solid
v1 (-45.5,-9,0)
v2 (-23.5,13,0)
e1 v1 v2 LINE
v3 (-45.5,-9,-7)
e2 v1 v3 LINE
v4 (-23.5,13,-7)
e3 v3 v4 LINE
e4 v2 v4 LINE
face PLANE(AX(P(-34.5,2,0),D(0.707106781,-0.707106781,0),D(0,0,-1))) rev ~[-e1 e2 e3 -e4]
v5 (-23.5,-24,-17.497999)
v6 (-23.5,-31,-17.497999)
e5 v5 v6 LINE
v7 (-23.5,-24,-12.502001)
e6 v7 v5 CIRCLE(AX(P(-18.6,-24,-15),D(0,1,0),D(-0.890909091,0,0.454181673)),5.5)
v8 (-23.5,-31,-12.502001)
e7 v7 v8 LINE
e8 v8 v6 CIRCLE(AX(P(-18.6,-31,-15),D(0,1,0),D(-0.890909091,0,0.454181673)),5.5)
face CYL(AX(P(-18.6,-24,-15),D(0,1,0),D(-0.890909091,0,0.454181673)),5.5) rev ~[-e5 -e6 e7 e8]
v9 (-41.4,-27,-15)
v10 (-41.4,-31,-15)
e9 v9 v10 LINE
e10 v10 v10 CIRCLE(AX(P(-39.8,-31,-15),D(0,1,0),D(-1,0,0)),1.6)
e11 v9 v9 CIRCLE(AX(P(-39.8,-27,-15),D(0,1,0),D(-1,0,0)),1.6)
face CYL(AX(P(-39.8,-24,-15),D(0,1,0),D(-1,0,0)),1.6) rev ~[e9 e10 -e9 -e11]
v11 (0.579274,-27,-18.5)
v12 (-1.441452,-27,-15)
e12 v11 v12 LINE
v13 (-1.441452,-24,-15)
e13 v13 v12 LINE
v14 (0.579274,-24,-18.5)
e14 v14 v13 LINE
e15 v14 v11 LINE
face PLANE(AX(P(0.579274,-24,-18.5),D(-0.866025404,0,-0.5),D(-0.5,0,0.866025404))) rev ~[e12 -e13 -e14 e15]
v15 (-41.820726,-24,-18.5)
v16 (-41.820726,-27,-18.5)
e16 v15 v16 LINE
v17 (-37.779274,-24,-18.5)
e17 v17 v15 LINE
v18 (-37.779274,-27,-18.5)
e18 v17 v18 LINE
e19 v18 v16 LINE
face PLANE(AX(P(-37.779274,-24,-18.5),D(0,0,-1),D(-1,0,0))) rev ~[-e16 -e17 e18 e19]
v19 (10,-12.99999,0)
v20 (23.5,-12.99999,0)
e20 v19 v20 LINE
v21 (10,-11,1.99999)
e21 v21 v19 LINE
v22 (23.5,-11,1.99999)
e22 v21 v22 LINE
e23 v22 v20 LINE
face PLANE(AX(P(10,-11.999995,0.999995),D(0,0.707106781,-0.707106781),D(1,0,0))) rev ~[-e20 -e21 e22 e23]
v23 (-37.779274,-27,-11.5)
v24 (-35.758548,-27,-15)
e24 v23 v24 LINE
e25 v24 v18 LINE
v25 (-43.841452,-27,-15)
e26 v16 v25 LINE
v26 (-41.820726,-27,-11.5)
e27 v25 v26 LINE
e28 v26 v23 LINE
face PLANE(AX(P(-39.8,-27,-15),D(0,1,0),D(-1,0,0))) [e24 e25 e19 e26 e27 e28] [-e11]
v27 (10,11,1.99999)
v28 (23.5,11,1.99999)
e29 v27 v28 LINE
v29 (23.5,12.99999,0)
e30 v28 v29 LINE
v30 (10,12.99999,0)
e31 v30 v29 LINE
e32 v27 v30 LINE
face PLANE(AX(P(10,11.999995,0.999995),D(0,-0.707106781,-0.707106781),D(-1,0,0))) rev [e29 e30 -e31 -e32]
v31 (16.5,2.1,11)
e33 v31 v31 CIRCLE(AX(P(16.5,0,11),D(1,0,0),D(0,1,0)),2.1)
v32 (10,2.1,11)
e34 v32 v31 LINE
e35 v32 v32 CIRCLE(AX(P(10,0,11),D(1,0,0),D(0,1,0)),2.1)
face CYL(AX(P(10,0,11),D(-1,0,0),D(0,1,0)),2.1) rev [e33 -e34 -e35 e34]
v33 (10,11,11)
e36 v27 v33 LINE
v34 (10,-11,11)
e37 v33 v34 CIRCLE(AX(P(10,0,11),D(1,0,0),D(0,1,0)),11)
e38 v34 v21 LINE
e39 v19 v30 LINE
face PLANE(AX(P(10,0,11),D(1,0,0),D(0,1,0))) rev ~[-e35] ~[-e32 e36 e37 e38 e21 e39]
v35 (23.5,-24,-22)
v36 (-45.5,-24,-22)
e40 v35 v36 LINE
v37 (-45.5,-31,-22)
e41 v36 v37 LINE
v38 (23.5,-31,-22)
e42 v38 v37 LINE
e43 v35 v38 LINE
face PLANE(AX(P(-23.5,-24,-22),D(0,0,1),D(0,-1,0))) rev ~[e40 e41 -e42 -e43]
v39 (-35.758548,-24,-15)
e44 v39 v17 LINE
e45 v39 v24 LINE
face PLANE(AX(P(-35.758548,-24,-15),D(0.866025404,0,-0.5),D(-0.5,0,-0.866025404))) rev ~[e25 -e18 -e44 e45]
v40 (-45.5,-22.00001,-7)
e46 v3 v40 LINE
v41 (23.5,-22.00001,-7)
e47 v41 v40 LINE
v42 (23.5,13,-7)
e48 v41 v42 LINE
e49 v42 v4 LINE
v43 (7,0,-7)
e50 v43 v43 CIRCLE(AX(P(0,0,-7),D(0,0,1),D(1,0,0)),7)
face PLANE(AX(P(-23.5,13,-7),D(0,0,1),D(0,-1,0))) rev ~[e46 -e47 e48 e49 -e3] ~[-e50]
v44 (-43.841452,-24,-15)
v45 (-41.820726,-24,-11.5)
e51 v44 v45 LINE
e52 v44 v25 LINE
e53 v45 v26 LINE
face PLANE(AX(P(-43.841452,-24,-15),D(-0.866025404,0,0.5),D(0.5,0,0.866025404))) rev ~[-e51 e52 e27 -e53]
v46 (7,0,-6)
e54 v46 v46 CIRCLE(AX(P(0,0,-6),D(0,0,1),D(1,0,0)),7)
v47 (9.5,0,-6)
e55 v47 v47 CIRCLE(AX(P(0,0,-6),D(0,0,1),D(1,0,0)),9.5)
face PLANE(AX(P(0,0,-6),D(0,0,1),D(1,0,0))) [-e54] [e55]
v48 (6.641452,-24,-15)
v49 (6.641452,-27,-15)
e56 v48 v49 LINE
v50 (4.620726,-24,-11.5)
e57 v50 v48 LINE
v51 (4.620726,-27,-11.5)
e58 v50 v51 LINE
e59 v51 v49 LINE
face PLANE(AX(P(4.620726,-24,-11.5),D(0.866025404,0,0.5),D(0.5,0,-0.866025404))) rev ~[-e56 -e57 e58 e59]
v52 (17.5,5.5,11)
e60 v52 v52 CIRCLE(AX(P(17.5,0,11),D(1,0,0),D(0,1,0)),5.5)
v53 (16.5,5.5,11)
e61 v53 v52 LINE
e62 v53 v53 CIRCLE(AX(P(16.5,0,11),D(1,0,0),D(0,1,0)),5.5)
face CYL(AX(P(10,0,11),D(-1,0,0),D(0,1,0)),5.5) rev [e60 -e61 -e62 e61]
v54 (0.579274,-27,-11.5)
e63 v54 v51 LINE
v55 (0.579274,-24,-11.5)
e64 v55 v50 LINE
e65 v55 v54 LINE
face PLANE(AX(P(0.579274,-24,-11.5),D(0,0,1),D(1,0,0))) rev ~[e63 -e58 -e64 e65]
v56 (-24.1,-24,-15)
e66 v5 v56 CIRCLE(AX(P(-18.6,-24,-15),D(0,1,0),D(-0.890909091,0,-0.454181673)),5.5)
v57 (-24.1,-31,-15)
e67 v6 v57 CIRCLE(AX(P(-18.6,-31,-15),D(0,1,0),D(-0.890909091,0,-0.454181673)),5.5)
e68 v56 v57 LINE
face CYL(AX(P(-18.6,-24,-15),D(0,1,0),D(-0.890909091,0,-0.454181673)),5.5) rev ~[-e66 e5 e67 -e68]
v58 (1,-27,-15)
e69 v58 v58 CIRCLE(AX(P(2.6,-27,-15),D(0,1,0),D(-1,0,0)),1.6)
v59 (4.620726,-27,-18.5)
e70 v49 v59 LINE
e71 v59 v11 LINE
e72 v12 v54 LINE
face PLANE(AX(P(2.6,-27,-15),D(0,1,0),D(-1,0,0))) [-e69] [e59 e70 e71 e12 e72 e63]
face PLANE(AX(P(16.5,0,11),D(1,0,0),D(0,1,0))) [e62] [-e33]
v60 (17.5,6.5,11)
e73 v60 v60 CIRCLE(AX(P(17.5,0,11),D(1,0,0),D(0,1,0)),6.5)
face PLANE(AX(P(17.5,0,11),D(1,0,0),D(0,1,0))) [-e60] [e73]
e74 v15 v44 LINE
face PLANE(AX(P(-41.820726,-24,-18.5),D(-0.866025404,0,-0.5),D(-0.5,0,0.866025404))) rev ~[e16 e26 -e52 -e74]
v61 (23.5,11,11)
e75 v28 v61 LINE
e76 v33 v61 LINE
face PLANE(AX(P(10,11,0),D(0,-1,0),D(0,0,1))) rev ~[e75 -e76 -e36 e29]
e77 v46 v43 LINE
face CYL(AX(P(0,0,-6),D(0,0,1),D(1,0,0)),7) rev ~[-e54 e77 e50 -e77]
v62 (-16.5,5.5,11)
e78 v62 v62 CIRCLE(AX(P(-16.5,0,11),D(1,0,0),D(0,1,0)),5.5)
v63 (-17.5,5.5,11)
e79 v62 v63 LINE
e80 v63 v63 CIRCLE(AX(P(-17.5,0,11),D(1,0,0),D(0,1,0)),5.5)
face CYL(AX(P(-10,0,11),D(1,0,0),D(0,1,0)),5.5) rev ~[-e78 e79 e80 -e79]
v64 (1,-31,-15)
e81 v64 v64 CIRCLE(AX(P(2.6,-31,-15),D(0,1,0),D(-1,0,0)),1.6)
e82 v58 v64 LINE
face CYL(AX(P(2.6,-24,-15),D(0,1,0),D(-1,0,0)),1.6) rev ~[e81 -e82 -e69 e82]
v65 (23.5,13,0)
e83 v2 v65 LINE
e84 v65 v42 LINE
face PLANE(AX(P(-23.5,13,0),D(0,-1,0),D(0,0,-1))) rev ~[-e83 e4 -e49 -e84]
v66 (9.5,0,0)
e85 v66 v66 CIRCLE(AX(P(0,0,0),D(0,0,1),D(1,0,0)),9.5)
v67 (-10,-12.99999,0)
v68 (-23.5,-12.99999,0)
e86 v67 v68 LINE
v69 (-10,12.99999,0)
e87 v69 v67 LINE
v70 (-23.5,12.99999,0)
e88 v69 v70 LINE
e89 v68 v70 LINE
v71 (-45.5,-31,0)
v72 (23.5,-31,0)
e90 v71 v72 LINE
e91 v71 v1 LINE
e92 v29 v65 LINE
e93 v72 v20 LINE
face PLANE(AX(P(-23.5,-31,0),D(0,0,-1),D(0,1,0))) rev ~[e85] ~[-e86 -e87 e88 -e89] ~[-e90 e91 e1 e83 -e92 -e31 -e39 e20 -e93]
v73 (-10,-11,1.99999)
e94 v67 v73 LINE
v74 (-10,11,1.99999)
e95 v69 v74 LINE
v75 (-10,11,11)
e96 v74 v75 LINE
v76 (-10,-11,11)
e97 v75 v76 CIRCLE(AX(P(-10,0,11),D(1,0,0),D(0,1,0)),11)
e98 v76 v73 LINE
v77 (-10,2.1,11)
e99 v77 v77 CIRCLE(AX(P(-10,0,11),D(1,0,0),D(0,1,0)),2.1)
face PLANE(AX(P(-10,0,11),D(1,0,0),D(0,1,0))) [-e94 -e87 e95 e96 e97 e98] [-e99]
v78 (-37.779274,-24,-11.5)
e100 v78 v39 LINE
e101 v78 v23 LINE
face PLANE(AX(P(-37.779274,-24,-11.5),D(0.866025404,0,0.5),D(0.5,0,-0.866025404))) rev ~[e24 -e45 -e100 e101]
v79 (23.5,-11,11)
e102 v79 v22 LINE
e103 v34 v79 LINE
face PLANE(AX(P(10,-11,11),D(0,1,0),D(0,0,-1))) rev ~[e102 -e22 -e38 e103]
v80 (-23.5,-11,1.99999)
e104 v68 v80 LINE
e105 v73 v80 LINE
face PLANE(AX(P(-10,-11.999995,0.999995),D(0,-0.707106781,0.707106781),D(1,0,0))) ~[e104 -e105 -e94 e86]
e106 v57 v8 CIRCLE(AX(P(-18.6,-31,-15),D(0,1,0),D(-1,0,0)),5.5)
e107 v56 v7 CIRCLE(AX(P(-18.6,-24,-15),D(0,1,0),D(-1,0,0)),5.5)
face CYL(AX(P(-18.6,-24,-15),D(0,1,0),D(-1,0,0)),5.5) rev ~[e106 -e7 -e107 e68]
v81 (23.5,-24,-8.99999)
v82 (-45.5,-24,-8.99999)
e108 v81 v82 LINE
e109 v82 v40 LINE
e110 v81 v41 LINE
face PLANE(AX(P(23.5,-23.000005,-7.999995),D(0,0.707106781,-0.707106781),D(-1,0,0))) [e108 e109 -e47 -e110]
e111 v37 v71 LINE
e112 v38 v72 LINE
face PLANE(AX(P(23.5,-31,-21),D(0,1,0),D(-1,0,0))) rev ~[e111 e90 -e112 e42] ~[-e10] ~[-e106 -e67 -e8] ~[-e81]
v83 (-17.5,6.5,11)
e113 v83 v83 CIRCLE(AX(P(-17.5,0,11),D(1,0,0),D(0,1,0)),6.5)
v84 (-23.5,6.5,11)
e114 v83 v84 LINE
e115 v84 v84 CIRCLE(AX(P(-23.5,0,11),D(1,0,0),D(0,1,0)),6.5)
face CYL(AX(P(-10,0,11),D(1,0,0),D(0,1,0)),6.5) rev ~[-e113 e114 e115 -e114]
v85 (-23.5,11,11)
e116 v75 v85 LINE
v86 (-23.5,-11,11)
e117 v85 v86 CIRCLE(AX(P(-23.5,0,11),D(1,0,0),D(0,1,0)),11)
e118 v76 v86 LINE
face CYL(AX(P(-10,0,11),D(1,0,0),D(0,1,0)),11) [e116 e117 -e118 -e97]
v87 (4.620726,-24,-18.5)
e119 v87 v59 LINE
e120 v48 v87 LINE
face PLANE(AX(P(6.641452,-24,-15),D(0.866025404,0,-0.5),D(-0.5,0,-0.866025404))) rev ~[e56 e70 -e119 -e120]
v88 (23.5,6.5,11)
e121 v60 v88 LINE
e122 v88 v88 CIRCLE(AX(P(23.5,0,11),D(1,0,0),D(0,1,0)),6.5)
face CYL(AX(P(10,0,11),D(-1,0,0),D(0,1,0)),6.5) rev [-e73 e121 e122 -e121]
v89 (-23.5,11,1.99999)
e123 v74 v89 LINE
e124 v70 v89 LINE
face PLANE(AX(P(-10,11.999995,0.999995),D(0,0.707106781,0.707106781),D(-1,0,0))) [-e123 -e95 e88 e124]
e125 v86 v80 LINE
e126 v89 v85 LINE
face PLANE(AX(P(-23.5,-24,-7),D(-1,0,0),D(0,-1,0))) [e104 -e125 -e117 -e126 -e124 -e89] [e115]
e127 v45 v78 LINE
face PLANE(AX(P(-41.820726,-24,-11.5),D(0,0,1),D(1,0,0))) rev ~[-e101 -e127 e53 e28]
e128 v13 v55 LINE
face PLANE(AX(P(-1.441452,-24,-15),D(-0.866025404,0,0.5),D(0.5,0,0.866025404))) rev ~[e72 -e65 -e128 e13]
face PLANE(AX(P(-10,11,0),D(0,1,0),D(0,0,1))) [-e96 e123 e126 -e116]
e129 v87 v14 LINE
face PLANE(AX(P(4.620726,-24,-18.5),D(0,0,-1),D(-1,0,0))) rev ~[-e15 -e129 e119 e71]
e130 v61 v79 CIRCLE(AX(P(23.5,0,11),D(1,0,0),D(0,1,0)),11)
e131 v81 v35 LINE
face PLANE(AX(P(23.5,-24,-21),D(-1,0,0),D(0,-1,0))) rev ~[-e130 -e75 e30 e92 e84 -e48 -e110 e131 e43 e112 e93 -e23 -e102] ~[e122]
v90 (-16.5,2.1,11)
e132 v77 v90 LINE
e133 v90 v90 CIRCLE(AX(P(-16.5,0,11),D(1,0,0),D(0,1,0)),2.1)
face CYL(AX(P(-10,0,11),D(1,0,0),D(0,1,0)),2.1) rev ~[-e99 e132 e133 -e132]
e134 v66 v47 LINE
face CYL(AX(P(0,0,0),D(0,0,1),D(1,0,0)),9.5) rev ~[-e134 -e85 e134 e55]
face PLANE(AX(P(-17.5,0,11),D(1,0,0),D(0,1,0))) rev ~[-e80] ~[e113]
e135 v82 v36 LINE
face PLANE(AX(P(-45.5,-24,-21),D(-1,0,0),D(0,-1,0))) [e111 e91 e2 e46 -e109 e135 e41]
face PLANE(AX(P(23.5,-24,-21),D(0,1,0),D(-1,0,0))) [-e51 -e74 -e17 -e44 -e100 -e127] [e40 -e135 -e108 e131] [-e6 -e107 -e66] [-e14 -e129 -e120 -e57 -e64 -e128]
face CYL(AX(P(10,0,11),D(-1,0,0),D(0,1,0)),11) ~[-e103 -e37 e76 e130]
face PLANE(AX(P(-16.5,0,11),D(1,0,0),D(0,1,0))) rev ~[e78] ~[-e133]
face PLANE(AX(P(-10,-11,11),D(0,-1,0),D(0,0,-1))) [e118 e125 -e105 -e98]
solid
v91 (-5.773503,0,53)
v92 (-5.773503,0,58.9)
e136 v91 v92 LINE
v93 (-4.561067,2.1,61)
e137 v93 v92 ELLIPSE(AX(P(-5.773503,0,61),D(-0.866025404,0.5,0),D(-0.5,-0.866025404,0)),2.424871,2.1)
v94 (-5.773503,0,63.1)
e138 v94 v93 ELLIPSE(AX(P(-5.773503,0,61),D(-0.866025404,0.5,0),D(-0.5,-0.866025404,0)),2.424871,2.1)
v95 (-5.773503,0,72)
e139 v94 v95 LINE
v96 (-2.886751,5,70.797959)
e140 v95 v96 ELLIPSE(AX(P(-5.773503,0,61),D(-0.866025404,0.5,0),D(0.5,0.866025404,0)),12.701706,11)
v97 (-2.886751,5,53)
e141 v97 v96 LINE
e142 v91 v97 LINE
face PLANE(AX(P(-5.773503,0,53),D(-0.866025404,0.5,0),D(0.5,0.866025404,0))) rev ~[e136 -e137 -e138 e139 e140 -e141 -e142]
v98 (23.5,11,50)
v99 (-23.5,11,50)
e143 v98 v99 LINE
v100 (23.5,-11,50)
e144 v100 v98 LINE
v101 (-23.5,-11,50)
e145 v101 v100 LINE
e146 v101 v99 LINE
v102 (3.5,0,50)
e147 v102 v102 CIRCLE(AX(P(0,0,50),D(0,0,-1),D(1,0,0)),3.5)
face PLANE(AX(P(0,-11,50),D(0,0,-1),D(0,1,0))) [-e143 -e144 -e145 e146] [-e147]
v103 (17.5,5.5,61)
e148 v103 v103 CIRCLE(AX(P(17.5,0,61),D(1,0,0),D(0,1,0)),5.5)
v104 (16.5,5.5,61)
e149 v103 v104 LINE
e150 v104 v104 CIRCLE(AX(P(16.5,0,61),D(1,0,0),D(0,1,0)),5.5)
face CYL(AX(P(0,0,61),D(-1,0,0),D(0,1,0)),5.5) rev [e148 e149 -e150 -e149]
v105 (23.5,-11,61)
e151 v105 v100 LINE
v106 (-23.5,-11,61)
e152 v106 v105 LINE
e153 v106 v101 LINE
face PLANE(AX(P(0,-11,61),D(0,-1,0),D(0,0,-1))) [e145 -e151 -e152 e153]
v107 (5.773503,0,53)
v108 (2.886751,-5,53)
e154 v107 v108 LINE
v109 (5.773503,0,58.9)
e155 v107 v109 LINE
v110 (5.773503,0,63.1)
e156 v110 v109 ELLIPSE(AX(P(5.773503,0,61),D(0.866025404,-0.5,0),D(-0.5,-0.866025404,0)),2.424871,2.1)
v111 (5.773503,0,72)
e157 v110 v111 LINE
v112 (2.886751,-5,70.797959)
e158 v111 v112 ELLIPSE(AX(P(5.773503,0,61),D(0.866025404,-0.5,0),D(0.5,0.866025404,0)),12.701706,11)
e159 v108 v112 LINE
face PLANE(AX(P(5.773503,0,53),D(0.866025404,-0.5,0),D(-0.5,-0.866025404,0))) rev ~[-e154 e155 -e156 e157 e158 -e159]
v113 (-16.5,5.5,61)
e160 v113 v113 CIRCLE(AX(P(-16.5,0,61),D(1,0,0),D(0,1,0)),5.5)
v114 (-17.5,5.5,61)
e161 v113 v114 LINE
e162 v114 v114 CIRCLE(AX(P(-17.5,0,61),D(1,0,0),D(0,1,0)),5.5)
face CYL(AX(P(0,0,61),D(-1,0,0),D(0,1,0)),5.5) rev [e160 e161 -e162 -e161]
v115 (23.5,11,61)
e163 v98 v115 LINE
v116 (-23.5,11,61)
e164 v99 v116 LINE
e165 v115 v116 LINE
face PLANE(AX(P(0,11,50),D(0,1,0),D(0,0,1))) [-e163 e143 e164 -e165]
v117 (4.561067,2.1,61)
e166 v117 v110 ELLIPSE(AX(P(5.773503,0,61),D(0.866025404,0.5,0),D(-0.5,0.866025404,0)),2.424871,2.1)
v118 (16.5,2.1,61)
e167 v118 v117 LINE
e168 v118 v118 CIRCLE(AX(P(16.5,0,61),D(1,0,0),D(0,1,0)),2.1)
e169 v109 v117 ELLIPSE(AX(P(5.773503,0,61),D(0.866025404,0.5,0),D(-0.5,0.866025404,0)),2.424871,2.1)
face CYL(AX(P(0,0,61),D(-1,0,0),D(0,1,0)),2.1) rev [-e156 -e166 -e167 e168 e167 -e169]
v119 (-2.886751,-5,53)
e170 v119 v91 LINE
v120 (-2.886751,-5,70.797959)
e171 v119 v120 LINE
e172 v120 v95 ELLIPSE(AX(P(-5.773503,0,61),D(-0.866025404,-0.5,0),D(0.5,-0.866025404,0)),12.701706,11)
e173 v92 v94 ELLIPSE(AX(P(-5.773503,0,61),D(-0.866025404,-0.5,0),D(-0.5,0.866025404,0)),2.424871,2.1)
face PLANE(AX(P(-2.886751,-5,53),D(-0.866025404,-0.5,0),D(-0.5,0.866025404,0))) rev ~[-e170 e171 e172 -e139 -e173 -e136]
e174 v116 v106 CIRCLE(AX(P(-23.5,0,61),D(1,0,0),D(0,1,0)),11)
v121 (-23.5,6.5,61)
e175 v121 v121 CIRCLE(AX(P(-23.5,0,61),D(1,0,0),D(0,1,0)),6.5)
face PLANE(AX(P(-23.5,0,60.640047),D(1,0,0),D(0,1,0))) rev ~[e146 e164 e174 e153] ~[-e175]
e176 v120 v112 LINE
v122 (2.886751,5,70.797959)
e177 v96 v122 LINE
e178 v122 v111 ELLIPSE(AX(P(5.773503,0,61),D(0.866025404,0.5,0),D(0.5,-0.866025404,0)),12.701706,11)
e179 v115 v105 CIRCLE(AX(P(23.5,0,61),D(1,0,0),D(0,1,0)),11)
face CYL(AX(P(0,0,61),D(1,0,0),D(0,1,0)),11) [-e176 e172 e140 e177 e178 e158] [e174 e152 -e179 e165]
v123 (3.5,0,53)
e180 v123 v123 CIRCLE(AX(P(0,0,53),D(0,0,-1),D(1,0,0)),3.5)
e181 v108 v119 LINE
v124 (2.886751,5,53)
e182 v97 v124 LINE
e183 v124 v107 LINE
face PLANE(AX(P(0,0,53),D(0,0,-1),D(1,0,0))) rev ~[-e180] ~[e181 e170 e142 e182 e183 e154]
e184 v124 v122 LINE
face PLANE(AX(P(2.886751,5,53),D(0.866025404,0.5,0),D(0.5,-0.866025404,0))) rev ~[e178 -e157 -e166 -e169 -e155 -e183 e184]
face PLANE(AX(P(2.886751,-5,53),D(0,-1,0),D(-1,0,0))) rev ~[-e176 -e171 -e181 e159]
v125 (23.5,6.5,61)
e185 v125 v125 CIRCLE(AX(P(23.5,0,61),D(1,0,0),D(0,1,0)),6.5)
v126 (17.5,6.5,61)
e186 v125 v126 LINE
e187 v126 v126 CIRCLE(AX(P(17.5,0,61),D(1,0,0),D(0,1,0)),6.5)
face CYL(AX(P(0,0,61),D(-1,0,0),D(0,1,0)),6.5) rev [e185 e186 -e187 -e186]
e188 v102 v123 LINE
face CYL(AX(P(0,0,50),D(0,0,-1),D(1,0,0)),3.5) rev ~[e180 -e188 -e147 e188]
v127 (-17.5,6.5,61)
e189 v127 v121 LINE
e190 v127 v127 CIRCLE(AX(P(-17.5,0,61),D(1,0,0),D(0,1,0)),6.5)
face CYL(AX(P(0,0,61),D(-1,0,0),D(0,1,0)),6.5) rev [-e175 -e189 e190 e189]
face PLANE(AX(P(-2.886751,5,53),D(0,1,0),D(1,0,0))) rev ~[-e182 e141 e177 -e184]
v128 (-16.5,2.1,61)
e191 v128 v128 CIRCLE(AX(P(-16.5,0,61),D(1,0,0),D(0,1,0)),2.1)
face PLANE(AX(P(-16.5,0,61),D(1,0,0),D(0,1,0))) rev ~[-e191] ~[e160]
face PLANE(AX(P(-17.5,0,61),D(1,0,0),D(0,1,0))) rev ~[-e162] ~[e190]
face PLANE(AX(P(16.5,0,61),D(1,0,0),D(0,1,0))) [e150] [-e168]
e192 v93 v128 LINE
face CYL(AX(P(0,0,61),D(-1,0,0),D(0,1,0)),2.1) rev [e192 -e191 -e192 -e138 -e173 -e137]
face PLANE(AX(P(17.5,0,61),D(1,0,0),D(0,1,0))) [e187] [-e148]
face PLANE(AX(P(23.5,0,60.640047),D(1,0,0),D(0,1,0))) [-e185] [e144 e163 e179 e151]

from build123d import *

# Parameters (mm, degrees)
F0_R      = 9.5
F1_DEPTH  = 7
F2_START  = -6
F0_R_2    = 7
F2_DEPTH  = 1
F3_W      = 47
F3_H      = 7
F4_DEPTH  = 14
F6_W      = 7
F6_H      = 14
F7_DEPTH  = 22
F9_START  = 10
F8_R      = 6.5
F9_DEPTH  = 13.5
F10_START = -10
F10_DEPTH = 13.5
F11_START = 10
F8_R_2    = 5.5
F11_DEPTH = 7.5
F12_START = -10
F12_DEPTH = 7.5
F13_START = -10
F8_R_3    = 2.1
F13_DEPTH = 6.5
F15_DEPTH = 22
F5_R      = 1.6
F5_R_2    = 4.85
F16_DEPTH = 25
F17_R     = 1.6
F18_DEPTH = 3
F19_DEPTH = 1
F20_SIZE  = 1.99999
F21_SIZE  = 22
F22_R     = 6.5
F23_DEPTH = 23.5
F22_R_2   = 5.5
F24_DEPTH = 17.5
F25_START = 10
F25_DEPTH = 6.5
F22_R_3   = 2.1
F26_DEPTH = 16.5
F28_START = -3
F27_R     = 3.5
F28_DEPTH = 22
F29_DEPTH = 25


# Not quite as in the source:
# - a fillet or chamfer is up to 0.001 mm smaller than in the source, because OpenCascade refuses the exact size


with BuildPart() as f1:
    # F0 (on Top) → F1 (new body)
    with BuildSketch(Plane.XY):
        Polygon((-23.5, 13), (-23.5, 0), (-23.5, -31), (23.5, -31), (23.5, 0), (23.5, 13), align=None)
        Circle(F0_R, mode=Mode.SUBTRACT)
    extrude(amount=-F1_DEPTH)

    # F0 (on Top) → F2 (join)
    with BuildSketch(Plane.XY.offset(F2_START)):
        Circle(F0_R)
        Circle(F0_R_2, mode=Mode.SUBTRACT)
    extrude(amount=-F2_DEPTH)

    # F3 (on face) → F4 (join)
    with BuildSketch(Plane(origin=(0, 0, -7), x_dir=(1, 0, 0), z_dir=(0, 0, -1))):
        with Locations((0, 27.5)):
            Rectangle(F3_W, F3_H)
    extrude(amount=F4_DEPTH)

    # F6 (on face) → F7 (join)
    with BuildSketch(Plane(origin=(-23.5, 0, 0), x_dir=(0, -1, 0), z_dir=(-1, 0, 0))):
        with Locations((27.5, -14)):
            Rectangle(F6_W, F6_H)
    extrude(amount=F7_DEPTH)

    # F8 (on Right) → F9 (join)
    with BuildSketch(Plane.YZ.offset(F9_START)):
        with BuildLine():
            Line((11, 0), (11, 11))
            ThreePointArc((11, 11), (7.7781745931, 3.2218254069), (0, 0))
            Line((0, 0), (11, 0))
        make_face()
        with BuildLine():
            ThreePointArc((0, 0), (-7.7781745931, 3.2218254069), (-11, 11))
            Line((-11, 11), (-11, 0))
            Line((-11, 0), (0, 0))
        make_face()
        with BuildLine():
            ThreePointArc((0, 0), (7.7781745931, 3.2218254069), (11, 11))
            ThreePointArc((11, 11), (0, 22), (-11, 11))
            ThreePointArc((-11, 11), (-7.7781745931, 3.2218254069), (0, 0))
        make_face()
        with Locations((0, 11)):
            Circle(F8_R, mode=Mode.SUBTRACT)
    extrude(amount=F9_DEPTH)

    # F8 (on Right) → F10 (join)
    with BuildSketch(Plane.YZ.offset(F10_START)):
        with BuildLine():
            ThreePointArc((0, 0), (-7.7781745931, 3.2218254069), (-11, 11))
            Line((-11, 11), (-11, 0))
            Line((-11, 0), (0, 0))
        make_face()
        with BuildLine():
            Line((11, 0), (11, 11))
            ThreePointArc((11, 11), (7.7781745931, 3.2218254069), (0, 0))
            Line((0, 0), (11, 0))
        make_face()
        with BuildLine():
            ThreePointArc((0, 0), (7.7781745931, 3.2218254069), (11, 11))
            ThreePointArc((11, 11), (0, 22), (-11, 11))
            ThreePointArc((-11, 11), (-7.7781745931, 3.2218254069), (0, 0))
        make_face()
        with Locations((0, 11)):
            Circle(F8_R, mode=Mode.SUBTRACT)
    extrude(amount=-F10_DEPTH)

    # F8 (on Right) → F11 (join)
    with BuildSketch(Plane.YZ.offset(F11_START)):
        with Locations((0, 11)):
            Circle(F8_R)
        with Locations((0, 11)):
            Circle(F8_R_2, mode=Mode.SUBTRACT)
    extrude(amount=F11_DEPTH)

    # F8 (on Right) → F12 (join)
    with BuildSketch(Plane.YZ.offset(F12_START)):
        with Locations((0, 11)):
            Circle(F8_R)
        with Locations((0, 11)):
            Circle(F8_R_2, mode=Mode.SUBTRACT)
    extrude(amount=-F12_DEPTH)

    # F8 (on Right) → F13 (join)
    with BuildSketch(Plane.YZ.offset(F13_START)):
        with Locations((0, 11)):
            Circle(F8_R_2)
        with Locations((0, 11)):
            Circle(F8_R_3, mode=Mode.SUBTRACT)
    extrude(amount=-F13_DEPTH)

    # F14 (on face) → F15 (join)
    with BuildSketch(Plane(origin=(-23.5, 0, 0), x_dir=(0, -1, 0), z_dir=(-1, 0, 0))):
        Polygon((-11, 0), (-13, 0), (-13, -7), (24, -7), (31, -7), (31, 0), (11, 0), align=None)
    extrude(amount=F15_DEPTH)

    # F5 (on face) → F16 (cut)
    with BuildSketch(Plane(origin=(0, -24, 0), x_dir=(-1, 0, 0), z_dir=(0, 1, 0))):
        with Locations((-2.6, -15)):
            Circle(F5_R)
        with Locations((39.8, -15)):
            Circle(F5_R)
        with BuildLine():
            Line((23.5, -17.4979991994), (23.5, -12.5020008006))
            ThreePointArc((23.5, -12.5020008006), (13.1, -15), (23.5, -17.4979991994))
        make_face()
        with Locations((18.6, -15)):
            Circle(F5_R_2, mode=Mode.SUBTRACT)
        with Locations((18.6, -15)):
            Circle(F5_R_2)
        with BuildLine():
            ThreePointArc((23.5, -17.4979991994), (23.9478967828, -16.2845232579), (24.1, -15))
            ThreePointArc((24.1, -15), (23.9478967828, -13.7154767421), (23.5, -12.5020008006))
            Line((23.5, -12.5020008006), (23.5, -17.4979991994))
        make_face()
    extrude(amount=-F16_DEPTH, mode=Mode.SUBTRACT)

    # F17 (on face) → F18 (cut)
    with BuildSketch(Plane(origin=(0, -24, 0), x_dir=(-1, 0, 0), z_dir=(0, 1, 0))):
        Polygon((-4.6207259422, -18.5), (-0.5792740578, -18.5), (1.4414518843, -15), (-0.5792740578, -11.5), (-4.6207259422, -11.5), (-6.6414518843, -15), align=None)
        with Locations((-2.6, -15)):
            Circle(F17_R, mode=Mode.SUBTRACT)
        Polygon((37.7792740578, -18.5), (41.8207259422, -18.5), (43.8414518843, -15), (41.8207259422, -11.5), (37.7792740578, -11.5), (35.7585481157, -15), align=None)
        with Locations((39.8, -15)):
            Circle(F17_R, mode=Mode.SUBTRACT)
    extrude(amount=-F18_DEPTH, mode=Mode.SUBTRACT)

    # F19 (add): a face of the model
    f19_faces = [f1.faces().sort_by_distance(p)[0] for p in [
        (-11, -27.5, -21),
    ]]
    extrude(f19_faces, amount=F19_DEPTH)

    # F20 (size 2 in the source; OpenCascade refuses exactly that, so slightly less here)
    f20_edges = [f1.edges().sort_by_distance(p)[0] for p in [
        (-11, -24, -7),
        (-16.75, 11, 0),
        (16.75, 11, 0),
        (16.75, -11, 0),
        (-16.75, -11, 0),
    ]]
    chamfer(f20_edges, length=F20_SIZE)

    # F21
    f21_edges = [f1.edges().sort_by_distance(p)[0] for p in [
        (-45.5, 13, -3.5),
    ]]
    chamfer(f21_edges, length=F21_SIZE)

    # F8 (on Right) → F25 (join)
    with BuildSketch(Plane.YZ.offset(F25_START)):
        with Locations((0, 11)):
            Circle(F8_R_2)
        with Locations((0, 11)):
            Circle(F8_R_3, mode=Mode.SUBTRACT)
    extrude(amount=F25_DEPTH)


with BuildPart() as f23:
    # F22 (on Right) → F23 (new body, symmetric)
    with BuildSketch(Plane.YZ):
        with BuildLine():
            ThreePointArc((0, 50), (7.7781745931, 53.2218254069), (11, 61))
            ThreePointArc((11, 61), (0, 72), (-11, 61))
            ThreePointArc((-11, 61), (-7.7781745931, 53.2218254069), (0, 50))
        make_face()
        with Locations((0, 61)):
            Circle(F22_R, mode=Mode.SUBTRACT)
        with BuildLine():
            ThreePointArc((0, 50), (-7.7781745931, 53.2218254069), (-11, 61))
            Line((-11, 61), (-11, 50))
            Line((-11, 50), (0, 50))
        make_face()
        with BuildLine():
            Line((11, 50), (11, 61))
            ThreePointArc((11, 61), (7.7781745931, 53.2218254069), (0, 50))
            Line((0, 50), (11, 50))
        make_face()
    extrude(amount=F23_DEPTH, both=True)

    # F22 (on Right) → F24 (join, symmetric)
    with BuildSketch(Plane.YZ):
        with Locations((0, 61)):
            Circle(F22_R)
        with Locations((0, 61)):
            Circle(F22_R_2, mode=Mode.SUBTRACT)
    extrude(amount=F24_DEPTH, both=True)

    # F22 (on Right) → F26 (join, symmetric)
    with BuildSketch(Plane.YZ):
        with Locations((0, 61)):
            Circle(F22_R_2)
        with Locations((0, 61)):
            Circle(F22_R_3, mode=Mode.SUBTRACT)
    extrude(amount=F26_DEPTH, both=True)

    # F27 (on face) → F28 (cut)
    with BuildSketch(Plane(origin=(0, 0, 50), x_dir=(1, 0, 0), z_dir=(0, 0, -1)).offset(F28_START)):
        Polygon((-2.8867513459, -5), (2.8867513459, -5), (5.7735026919, 0), (2.8867513459, 5), (-2.8867513459, 5), (-5.7735026919, 0), align=None)
        Circle(F27_R, mode=Mode.SUBTRACT)
        Circle(F27_R)
    extrude(amount=-F28_DEPTH, mode=Mode.SUBTRACT)

    # F27 (on face) → F29 (cut)
    with BuildSketch(Plane(origin=(0, 0, 50), x_dir=(1, 0, 0), z_dir=(0, 0, -1))):
        Circle(F27_R)
    extrude(amount=-F29_DEPTH, mode=Mode.SUBTRACT)


solid = Compound([f1.part, f23.part])
